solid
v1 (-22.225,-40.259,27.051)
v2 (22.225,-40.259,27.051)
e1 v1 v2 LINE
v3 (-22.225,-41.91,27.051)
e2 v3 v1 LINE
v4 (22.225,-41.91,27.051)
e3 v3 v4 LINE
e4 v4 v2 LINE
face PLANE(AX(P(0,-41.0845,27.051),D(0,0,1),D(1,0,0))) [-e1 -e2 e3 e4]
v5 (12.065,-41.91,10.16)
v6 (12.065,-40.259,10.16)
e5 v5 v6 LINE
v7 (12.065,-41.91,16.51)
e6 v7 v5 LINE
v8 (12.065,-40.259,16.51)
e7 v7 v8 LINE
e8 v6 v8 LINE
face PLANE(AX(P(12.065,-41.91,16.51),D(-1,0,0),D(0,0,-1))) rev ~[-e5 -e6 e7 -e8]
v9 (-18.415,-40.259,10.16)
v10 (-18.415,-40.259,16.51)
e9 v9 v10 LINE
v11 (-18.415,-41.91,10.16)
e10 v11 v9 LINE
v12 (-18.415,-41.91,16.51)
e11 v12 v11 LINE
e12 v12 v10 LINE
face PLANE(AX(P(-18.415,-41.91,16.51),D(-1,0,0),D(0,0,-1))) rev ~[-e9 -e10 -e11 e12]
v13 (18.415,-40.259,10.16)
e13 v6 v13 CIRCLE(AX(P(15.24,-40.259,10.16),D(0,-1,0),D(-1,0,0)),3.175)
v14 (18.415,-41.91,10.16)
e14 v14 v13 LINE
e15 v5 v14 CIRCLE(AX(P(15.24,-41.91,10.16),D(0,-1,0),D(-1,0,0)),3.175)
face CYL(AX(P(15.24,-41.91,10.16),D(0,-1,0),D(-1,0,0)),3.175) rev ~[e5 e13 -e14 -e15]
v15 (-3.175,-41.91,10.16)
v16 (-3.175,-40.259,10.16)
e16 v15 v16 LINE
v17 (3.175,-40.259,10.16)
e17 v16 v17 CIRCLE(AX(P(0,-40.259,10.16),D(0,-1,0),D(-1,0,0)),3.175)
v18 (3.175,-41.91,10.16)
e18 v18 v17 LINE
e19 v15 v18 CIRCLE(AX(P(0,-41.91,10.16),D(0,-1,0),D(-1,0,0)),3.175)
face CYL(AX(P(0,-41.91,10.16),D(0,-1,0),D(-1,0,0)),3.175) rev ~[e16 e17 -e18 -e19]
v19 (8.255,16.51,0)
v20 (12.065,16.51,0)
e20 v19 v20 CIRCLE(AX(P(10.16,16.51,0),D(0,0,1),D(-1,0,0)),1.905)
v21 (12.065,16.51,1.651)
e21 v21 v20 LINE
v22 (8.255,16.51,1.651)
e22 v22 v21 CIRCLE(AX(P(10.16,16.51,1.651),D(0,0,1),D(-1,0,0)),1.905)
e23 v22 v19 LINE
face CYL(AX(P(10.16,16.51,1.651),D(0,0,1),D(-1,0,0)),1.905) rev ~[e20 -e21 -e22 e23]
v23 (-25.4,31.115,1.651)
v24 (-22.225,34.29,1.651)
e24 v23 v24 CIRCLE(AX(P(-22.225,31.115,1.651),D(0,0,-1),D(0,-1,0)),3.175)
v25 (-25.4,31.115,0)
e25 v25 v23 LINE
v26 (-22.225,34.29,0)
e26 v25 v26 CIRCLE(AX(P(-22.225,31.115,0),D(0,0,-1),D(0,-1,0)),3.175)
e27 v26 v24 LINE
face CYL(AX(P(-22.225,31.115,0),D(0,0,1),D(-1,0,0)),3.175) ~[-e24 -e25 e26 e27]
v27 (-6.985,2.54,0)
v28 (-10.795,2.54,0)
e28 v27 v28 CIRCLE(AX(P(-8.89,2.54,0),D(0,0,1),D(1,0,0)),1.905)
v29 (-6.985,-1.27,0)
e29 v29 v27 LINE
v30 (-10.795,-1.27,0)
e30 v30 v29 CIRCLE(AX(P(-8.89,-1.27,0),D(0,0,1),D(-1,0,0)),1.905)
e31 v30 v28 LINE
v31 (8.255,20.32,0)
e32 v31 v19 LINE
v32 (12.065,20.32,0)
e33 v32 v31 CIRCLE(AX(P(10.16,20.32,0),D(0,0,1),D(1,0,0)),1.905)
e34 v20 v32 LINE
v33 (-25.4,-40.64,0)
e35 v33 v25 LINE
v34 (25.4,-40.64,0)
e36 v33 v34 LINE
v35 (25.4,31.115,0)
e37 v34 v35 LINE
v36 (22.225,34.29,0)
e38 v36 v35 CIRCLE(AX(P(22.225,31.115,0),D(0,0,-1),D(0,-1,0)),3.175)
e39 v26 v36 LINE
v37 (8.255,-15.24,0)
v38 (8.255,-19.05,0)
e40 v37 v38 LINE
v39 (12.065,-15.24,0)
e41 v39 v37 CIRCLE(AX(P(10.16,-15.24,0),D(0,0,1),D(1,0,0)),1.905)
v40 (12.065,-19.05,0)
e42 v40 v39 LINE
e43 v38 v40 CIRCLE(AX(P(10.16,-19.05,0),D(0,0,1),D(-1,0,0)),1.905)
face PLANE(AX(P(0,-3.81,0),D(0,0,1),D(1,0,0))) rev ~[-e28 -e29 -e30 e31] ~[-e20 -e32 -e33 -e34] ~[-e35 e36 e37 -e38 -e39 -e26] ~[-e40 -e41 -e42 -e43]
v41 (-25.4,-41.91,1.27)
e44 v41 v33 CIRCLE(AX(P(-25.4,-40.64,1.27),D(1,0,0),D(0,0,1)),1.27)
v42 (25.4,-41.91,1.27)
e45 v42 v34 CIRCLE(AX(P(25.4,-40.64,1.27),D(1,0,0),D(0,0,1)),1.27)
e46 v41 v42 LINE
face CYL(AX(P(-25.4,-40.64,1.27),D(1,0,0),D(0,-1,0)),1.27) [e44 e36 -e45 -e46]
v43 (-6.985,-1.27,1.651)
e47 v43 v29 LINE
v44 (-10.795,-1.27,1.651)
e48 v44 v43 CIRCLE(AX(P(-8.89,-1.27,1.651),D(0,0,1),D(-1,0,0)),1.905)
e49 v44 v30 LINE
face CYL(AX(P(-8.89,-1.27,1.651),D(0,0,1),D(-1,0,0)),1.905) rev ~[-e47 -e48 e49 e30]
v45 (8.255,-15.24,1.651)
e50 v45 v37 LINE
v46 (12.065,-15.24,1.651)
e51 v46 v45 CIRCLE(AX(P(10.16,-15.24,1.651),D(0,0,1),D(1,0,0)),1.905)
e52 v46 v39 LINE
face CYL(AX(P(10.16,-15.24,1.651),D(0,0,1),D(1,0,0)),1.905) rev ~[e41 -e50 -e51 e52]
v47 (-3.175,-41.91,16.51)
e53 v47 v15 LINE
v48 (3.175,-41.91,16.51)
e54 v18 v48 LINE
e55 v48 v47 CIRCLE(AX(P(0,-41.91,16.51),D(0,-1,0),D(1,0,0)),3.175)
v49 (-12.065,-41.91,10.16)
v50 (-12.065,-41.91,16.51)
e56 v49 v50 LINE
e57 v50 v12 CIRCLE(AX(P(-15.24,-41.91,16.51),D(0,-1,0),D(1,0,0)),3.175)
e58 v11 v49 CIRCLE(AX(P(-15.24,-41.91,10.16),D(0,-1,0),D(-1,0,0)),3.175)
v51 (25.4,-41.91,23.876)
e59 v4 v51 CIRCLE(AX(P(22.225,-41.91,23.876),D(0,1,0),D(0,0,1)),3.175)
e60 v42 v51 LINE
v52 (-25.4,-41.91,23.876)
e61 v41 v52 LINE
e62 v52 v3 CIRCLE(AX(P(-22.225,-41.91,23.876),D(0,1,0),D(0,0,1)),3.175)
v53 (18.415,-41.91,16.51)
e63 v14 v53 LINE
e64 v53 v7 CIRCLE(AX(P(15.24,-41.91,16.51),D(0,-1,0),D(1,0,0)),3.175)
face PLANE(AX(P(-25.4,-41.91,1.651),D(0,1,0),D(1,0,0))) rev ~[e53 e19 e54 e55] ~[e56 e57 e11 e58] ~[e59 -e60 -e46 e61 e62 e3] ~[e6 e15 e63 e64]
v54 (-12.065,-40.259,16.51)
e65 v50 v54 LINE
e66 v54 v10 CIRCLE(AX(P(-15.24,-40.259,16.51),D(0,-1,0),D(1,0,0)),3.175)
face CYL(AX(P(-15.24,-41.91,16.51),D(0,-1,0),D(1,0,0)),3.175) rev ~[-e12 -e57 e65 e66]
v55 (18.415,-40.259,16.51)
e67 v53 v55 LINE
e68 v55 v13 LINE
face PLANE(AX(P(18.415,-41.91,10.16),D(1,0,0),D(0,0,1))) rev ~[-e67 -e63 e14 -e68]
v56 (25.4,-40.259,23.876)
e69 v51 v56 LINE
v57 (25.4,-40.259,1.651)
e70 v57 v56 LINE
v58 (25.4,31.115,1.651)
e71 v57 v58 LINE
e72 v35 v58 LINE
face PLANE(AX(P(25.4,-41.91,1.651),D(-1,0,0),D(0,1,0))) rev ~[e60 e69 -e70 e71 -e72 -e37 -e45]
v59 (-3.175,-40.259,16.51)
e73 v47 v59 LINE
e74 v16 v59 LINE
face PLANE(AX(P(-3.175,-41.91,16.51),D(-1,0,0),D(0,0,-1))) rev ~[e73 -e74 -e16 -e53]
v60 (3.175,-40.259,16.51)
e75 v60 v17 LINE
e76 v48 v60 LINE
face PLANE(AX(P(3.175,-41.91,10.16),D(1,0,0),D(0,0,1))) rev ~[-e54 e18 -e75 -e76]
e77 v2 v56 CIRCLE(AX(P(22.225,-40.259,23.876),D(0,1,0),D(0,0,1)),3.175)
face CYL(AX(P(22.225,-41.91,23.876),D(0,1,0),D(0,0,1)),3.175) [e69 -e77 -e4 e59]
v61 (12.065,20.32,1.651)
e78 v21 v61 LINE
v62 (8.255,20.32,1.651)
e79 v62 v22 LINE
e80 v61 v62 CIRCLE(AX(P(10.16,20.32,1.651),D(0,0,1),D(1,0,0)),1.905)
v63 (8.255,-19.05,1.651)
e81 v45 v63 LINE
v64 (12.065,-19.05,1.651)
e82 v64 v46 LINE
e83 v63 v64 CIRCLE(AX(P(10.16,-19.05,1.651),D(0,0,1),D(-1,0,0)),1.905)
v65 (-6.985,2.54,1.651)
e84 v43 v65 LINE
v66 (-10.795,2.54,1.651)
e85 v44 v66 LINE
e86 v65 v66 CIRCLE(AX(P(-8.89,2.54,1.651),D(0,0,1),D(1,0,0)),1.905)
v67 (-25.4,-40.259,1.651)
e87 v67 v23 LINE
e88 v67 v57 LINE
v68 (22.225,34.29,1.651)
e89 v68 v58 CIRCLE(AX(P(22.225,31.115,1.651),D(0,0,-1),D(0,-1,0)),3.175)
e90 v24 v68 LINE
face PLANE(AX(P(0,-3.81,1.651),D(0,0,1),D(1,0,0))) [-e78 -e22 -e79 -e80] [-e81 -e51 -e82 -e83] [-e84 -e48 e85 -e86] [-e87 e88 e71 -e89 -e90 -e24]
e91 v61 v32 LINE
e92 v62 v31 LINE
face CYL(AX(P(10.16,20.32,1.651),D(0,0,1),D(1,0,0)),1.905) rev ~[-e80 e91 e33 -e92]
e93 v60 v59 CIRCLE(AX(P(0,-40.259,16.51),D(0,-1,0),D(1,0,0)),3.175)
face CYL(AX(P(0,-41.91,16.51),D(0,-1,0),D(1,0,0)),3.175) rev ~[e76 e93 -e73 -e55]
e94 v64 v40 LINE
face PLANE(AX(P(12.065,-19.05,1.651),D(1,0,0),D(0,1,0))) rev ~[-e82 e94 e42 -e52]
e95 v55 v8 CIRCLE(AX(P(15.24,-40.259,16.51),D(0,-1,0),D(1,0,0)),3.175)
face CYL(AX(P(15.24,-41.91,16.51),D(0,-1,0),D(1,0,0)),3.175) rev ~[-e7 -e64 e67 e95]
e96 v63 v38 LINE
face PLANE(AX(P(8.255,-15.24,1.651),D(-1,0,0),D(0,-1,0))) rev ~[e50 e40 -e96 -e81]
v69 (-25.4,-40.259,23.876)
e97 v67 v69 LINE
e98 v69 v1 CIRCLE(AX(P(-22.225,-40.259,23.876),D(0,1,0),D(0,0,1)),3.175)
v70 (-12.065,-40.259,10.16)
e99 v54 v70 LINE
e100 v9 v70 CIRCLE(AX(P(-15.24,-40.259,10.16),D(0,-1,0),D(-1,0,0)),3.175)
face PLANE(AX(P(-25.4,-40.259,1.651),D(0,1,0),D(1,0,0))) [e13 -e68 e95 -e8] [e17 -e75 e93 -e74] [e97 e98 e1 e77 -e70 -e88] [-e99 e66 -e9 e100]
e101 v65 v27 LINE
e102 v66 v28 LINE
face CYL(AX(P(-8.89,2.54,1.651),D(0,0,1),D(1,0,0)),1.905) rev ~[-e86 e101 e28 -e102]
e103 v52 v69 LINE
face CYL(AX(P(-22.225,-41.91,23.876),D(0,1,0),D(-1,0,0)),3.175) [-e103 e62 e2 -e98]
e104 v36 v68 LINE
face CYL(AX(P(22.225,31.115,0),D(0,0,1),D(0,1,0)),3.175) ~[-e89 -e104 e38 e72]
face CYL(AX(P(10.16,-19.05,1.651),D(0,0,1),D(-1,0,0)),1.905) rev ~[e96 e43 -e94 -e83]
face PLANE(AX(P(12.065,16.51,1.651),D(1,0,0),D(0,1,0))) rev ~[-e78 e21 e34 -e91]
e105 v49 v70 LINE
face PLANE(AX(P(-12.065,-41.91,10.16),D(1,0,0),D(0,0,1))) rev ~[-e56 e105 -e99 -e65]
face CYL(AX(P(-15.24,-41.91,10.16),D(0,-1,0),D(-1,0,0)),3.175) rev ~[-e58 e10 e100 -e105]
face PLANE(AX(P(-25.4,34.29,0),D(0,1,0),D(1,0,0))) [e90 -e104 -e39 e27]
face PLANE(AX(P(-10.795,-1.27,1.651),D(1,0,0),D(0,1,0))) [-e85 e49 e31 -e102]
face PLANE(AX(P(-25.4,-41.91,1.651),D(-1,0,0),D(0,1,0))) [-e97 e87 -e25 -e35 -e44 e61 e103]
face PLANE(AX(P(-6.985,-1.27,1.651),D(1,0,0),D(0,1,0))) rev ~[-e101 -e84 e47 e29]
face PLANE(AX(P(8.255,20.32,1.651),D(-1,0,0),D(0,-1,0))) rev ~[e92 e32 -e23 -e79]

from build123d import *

# Parameters (mm, degrees)
F0_W     = 50.8
F0_H     = 76.2
F1_DEPTH = 1.651
F2_W     = 50.8
F2_H     = 1.651
F3_DEPTH = 25.4
F4_R     = 1.27
F5_R     = 3.175
F6_W     = 1.905
F6_H     = 3.81
F7_DEPTH = 25.4
F9_DEPTH = 25.4


# Not quite as in the source:
# - a feature names something its author has since deleted; it is built from what else it names


with BuildPart() as f1:
    # F0 (on Top) → F1 (new body)
    with BuildSketch(Plane.XY):
        with Locations((0, -3.81)):
            Rectangle(F0_W, F0_H)
    extrude(amount=F1_DEPTH)

    # F2 (on face) → F3 (join)
    with BuildSketch(Plane.XY.offset(1.651)):
        with Locations((0, -41.0845)):
            Rectangle(F2_W, F2_H)
    extrude(amount=F3_DEPTH)

    # F4
    f4_edges = [f1.edges().sort_by_distance(p)[0] for p in [
        (0, -41.91, 0),
    ]]
    fillet(f4_edges, radius=F4_R)

    # F5
    f5_edges = [f1.edges().sort_by_distance(p)[0] for p in [
        (25.4, 34.29, 0.8255),
        (-25.4, 34.29, 0.8255),
        (25.4, -41.0845, 27.051),
        (-25.4, -41.0845, 27.051),
    ]]
    fillet(f5_edges, radius=F5_R)

    # F6 (on face) → F7 (cut)
    with BuildSketch(Plane.XY.offset(1.651)):
        with BuildLine():
            Line((-6.985, -1.27), (-6.985, 2.54))
            ThreePointArc((-6.985, 2.54), (-8.89, 4.445), (-10.795, 2.54))
            Line((-10.795, 2.54), (-8.89, 2.54))
            Line((-8.89, 2.54), (-8.89, -1.27))
            Line((-8.89, -1.27), (-10.795, -1.27))
            ThreePointArc((-10.795, -1.27), (-8.89, -3.175), (-6.985, -1.27))
        make_face()
        with Locations((-9.8425, 0.635)):
            Rectangle(F6_W, F6_H)
        with BuildLine():
            ThreePointArc((8.255, 16.51), (10.16, 14.605), (12.065, 16.51))
            Line((12.065, 16.51), (12.065, 20.32))
            ThreePointArc((12.065, 20.32), (10.16, 22.225), (8.255, 20.32))
            Line((8.255, 20.32), (8.255, 16.51))
        make_face()
        with BuildLine():
            ThreePointArc((12.065, -15.24), (10.16, -13.335), (8.255, -15.24))
            Line((8.255, -15.24), (8.255, -19.05))
            ThreePointArc((8.255, -19.05), (10.16, -20.955), (12.065, -19.05))
            Line((12.065, -19.05), (12.065, -15.24))
        make_face()
    extrude(amount=-F7_DEPTH, mode=Mode.SUBTRACT)

    # F8 (on face) → F9 (cut)
    with BuildSketch(Plane.XZ.offset(41.91)):
        with BuildLine():
            ThreePointArc((-12.065, 16.51), (-15.24, 19.685), (-18.415, 16.51))
            Line((-18.415, 16.51), (-18.415, 10.16))
            ThreePointArc((-18.415, 10.16), (-15.24, 6.985), (-12.065, 10.16))
            Line((-12.065, 10.16), (-12.065, 16.51))
        make_face()
        with BuildLine():
            Line((3.175, 10.16), (3.175, 16.51))
            ThreePointArc((3.175, 16.51), (0, 19.685), (-3.175, 16.51))
            Line((-3.175, 16.51), (-3.175, 10.16))
            ThreePointArc((-3.175, 10.16), (0, 6.985), (3.175, 10.16))
        make_face()
        with BuildLine():
            Line((18.415, 10.16), (18.415, 16.51))
            ThreePointArc((18.415, 16.51), (15.24, 19.685), (12.065, 16.51))
            Line((12.065, 16.51), (12.065, 10.16))
            ThreePointArc((12.065, 10.16), (15.24, 6.985), (18.415, 10.16))
        make_face()
    extrude(amount=-F9_DEPTH, mode=Mode.SUBTRACT)


solid = f1.part
